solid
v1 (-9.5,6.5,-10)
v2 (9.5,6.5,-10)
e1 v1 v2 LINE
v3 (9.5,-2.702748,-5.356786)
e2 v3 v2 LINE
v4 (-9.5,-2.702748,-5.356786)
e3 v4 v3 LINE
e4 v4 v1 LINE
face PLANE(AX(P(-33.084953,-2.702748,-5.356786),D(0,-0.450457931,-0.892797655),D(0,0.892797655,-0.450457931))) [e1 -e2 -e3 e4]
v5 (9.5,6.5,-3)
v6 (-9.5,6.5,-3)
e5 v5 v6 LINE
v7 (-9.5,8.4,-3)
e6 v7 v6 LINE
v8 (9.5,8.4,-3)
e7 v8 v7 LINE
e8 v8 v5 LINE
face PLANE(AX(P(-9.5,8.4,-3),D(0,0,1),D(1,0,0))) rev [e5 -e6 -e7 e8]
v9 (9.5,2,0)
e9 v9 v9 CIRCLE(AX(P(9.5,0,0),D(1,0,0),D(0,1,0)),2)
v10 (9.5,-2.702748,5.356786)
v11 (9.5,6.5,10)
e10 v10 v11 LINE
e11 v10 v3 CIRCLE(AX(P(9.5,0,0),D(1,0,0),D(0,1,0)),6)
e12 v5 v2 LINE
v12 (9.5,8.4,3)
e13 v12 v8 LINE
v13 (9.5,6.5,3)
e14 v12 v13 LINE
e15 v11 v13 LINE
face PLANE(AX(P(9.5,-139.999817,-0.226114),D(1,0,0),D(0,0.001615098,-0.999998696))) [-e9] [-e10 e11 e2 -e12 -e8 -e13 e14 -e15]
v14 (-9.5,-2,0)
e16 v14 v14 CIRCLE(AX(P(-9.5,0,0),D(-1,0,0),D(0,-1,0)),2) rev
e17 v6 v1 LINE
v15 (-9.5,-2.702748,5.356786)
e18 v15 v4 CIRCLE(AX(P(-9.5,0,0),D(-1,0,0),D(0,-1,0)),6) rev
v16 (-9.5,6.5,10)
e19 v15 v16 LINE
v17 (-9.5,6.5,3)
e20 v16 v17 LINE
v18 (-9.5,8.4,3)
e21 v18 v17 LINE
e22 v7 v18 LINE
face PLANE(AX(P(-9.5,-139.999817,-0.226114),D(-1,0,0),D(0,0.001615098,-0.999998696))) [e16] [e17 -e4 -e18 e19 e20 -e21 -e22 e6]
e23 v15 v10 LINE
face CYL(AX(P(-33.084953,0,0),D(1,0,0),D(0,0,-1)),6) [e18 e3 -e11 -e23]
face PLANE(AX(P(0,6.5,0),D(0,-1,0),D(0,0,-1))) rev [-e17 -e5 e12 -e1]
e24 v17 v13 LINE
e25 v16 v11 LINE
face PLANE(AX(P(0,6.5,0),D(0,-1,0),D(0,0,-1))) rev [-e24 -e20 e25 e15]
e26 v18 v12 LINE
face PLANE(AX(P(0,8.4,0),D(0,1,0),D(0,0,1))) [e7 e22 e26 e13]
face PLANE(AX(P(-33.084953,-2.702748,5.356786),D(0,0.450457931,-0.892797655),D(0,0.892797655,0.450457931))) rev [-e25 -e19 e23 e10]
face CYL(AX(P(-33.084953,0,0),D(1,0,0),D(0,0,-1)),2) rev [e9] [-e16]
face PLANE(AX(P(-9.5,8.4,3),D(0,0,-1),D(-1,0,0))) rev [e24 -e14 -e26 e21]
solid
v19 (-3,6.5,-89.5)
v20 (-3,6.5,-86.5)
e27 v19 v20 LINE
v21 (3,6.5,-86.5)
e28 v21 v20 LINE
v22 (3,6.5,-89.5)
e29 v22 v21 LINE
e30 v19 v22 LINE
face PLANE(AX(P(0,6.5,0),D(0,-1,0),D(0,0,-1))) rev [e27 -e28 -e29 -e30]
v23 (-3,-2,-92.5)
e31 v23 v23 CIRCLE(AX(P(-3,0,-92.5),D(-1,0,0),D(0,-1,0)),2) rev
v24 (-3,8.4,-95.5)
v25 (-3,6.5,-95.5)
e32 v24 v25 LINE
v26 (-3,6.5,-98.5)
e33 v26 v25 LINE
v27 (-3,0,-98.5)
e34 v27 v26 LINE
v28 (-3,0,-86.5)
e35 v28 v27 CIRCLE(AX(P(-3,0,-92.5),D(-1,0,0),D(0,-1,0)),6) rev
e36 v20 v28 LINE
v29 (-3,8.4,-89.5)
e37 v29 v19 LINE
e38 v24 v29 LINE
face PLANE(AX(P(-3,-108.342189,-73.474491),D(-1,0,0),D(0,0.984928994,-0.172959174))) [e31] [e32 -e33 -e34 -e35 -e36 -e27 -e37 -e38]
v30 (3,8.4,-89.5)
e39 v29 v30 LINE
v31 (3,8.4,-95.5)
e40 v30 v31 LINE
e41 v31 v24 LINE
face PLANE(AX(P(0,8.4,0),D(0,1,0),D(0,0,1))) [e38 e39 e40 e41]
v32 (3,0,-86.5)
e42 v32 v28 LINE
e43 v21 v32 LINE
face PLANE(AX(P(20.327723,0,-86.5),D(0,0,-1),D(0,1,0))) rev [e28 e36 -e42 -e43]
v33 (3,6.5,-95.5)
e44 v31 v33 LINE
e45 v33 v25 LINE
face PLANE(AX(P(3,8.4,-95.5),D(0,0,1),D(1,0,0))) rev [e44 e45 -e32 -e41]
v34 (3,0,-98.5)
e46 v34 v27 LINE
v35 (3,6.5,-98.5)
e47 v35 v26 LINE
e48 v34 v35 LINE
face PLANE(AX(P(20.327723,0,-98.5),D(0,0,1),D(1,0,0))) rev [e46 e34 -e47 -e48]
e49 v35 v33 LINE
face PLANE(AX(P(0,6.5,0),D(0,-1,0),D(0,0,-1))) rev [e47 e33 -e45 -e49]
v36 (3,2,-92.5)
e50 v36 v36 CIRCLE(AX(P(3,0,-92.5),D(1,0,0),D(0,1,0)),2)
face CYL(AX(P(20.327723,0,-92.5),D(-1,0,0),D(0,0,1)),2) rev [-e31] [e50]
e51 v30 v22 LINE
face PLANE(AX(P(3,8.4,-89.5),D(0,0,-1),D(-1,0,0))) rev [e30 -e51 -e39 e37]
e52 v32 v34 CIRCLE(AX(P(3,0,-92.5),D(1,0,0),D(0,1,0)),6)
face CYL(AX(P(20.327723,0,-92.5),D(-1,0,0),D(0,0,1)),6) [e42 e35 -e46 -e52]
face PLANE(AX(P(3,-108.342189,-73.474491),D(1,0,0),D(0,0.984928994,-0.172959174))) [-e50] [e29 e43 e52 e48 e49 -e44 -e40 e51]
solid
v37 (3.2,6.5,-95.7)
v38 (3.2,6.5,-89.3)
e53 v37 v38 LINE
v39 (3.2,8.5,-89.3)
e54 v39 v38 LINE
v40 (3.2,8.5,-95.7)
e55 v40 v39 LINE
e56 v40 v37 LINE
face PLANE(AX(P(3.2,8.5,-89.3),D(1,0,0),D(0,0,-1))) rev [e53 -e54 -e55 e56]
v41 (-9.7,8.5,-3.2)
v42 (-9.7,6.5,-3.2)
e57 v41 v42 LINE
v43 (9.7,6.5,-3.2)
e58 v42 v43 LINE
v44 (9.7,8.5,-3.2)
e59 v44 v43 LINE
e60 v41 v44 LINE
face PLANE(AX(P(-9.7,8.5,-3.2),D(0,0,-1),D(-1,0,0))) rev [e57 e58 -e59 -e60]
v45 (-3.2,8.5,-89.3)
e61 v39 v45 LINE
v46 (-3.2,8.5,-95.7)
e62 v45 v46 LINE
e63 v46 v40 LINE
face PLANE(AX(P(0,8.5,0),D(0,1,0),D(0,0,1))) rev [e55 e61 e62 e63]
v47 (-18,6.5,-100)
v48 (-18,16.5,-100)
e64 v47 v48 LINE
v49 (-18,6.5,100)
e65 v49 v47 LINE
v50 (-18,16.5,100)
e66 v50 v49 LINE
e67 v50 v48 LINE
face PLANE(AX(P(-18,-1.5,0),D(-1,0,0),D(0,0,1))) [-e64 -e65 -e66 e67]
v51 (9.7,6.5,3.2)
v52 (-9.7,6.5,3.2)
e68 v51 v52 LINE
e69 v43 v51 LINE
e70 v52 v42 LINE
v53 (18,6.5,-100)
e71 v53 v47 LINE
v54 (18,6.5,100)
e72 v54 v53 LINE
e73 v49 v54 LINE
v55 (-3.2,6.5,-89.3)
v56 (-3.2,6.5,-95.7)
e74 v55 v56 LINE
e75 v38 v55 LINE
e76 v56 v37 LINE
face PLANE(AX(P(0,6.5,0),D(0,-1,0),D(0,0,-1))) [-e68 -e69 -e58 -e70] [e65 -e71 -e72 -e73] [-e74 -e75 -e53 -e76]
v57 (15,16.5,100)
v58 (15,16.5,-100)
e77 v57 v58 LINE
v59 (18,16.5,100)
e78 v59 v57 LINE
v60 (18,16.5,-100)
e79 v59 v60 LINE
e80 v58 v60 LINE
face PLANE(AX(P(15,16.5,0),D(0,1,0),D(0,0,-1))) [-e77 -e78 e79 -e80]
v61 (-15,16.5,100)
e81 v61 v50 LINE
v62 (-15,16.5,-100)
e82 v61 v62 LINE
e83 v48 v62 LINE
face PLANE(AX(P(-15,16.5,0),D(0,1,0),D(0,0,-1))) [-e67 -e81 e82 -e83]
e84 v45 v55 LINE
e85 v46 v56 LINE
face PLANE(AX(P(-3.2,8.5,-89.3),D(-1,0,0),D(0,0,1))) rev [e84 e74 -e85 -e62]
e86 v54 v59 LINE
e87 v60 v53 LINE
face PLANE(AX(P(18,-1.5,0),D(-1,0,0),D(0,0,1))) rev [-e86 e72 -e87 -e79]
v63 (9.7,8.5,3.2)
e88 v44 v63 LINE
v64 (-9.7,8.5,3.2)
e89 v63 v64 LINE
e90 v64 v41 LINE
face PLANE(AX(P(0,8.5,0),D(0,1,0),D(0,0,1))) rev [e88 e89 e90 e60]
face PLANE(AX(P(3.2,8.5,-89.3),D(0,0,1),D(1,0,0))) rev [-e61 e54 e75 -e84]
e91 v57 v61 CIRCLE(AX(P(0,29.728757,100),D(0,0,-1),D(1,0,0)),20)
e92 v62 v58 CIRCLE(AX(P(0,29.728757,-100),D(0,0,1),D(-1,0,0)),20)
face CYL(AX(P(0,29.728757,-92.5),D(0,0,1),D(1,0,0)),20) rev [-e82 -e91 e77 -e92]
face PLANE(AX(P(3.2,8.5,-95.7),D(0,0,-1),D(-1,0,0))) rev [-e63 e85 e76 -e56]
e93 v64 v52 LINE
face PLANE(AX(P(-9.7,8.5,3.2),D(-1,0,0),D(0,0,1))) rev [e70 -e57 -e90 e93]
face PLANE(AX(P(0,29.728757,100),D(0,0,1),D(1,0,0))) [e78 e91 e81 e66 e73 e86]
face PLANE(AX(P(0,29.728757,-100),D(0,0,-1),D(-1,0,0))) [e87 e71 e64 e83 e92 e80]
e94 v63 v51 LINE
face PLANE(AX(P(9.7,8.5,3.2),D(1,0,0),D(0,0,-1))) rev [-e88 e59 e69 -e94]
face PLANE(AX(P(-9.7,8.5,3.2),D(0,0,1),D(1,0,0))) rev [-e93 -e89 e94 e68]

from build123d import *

# Parameters (mm, degrees)
THICKEN1_START           = -92.5
THICKEN1_OUTLINE_W       = 30
THICKEN1_OUTLINE_H       = 4.5
THICKEN1_DEPTH           = 185
THICKEN2_START           = -92.5
THICKEN2_OUTLINE_W       = 3
THICKEN2_OUTLINE_H       = 18
THICKEN2_DEPTH           = 185
THICKEN3_START           = -92.5
THICKEN3_OUTLINE_W       = 3
THICKEN3_OUTLINE_H       = 18
THICKEN3_DEPTH           = 185
BOSS_EXTRUDE1_DEPTH      = 185
SKETCH7_W                = 36
SKETCH7_H                = 8
CUT_EXTRUDE1_DEPTH       = 187.604528348
BOSS_EXTRUDE2_DEPTH      = 7.5
BOSS_EXTRUDE3_START      = 7.5
BOSS_EXTRUDE3_DEPTH      = 7.5
BOSS_EXTRUDE4_DEPTH      = 9.5
BOSS_EXTRUDE4_DEPTH_BACK = 9.5
SKETCH10_R               = 6
SKETCH10_R_2             = 2
BOSS_EXTRUDE5_DEPTH      = 3
BOSS_EXTRUDE5_DEPTH_BACK = 3
SKETCH11_R               = 6
SKETCH11_R_2             = 2
SKETCH12_W               = 19.4
SKETCH12_H               = 6.4
SKETCH12_W_2             = 6.4
CUT_EXTRUDE2_DEPTH       = 2
SKETCH13_W               = 6
SKETCH13_H               = 6
SKETCH13_W_2             = 19
BOSS_EXTRUDE6_DEPTH      = 1.9


# Read off the part's stored shape, not the designer's step: Thicken1, Thicken2, Thicken3
with BuildPart() as part:
    # Thicken1 outline → Thicken1 (new body)
    with BuildSketch(Plane.XY.offset(THICKEN1_START)):
        with Locations((0, 0.75)):
            Rectangle(THICKEN1_OUTLINE_W, THICKEN1_OUTLINE_H)
    extrude(amount=THICKEN1_DEPTH)

    # Thicken2 outline → Thicken2 (add)
    with BuildSketch(Plane.XY.offset(THICKEN2_START)):
        with Locations((16.5, 7.5)):
            Rectangle(THICKEN2_OUTLINE_W, THICKEN2_OUTLINE_H)
    extrude(amount=THICKEN2_DEPTH)

    # Thicken3 outline → Thicken3 (add)
    with BuildSketch(Plane.XY.offset(THICKEN3_START)):
        with Locations((-16.5, 7.5)):
            Rectangle(THICKEN3_OUTLINE_W, THICKEN3_OUTLINE_H)
    extrude(amount=THICKEN3_DEPTH)

    # Sketch4 → Boss-Extrude1 (add)
    with BuildSketch(Plane.XY.offset(92.5)):
        with BuildLine():
            Line((-15, 16.5), (-15, 3))
            Line((-15, 3), (15, 3))
            Line((15, 3), (15, 16.5))
            ThreePointArc((15, 16.5), (0, 9.728756555), (-15, 16.5))
        make_face()
    extrude(amount=-BOSS_EXTRUDE1_DEPTH)

    # Sketch7 → Cut-Extrude1 (cut, through all)
    with BuildSketch(Plane(origin=(0, 0, -92.5), x_dir=(-1, 0, 0), z_dir=(0, 0, -1))):
        with Locations((0, 2.5)):
            Rectangle(SKETCH7_W, SKETCH7_H)
    extrude(amount=-CUT_EXTRUDE1_DEPTH, mode=Mode.SUBTRACT)

    # Sketch8 → Boss-Extrude2 (add)
    with BuildSketch(Plane(origin=(0, 0, -92.5), x_dir=(-1, 0, 0), z_dir=(0, 0, -1))):
        with BuildLine():
            Line((-18, 6.5), (18, 6.5))
            Line((18, 6.5), (18, 16.5))
            Line((18, 16.5), (15, 16.5))
            ThreePointArc((15, 16.5), (0, 9.728756555), (-15, 16.5))
            Line((-15, 16.5), (-18, 16.5))
            Line((-18, 16.5), (-18, 6.5))
        make_face()
    extrude(amount=BOSS_EXTRUDE2_DEPTH)

    # Sketch9 → Boss-Extrude3 (add)
    with BuildSketch(Plane.XY.offset(92.5).offset(BOSS_EXTRUDE3_START)):
        with BuildLine():
            Line((-18, 6.5), (18, 6.5))
            Line((18, 6.5), (18, 16.5))
            Line((18, 16.5), (15, 16.5))
            ThreePointArc((15, 16.5), (0, 9.728756555), (-15, 16.5))
            Line((-15, 16.5), (-18, 16.5))
            Line((-18, 16.5), (-18, 6.5))
        make_face()
    extrude(amount=-BOSS_EXTRUDE3_DEPTH)

    # Sketch10 → Boss-Extrude4 (add, two sides: drawn at the far end of the back side and taken through both)
    # profile 1 of 2: a face of its own
    with BuildSketch(Plane(origin=(0, 0, 0), x_dir=(0, 0, -1), z_dir=(1, 0, 0)).offset(-BOSS_EXTRUDE4_DEPTH_BACK)):
        Circle(SKETCH10_R)
        with Locations(Location((0, 0, 0), (0, 0, 90))):
            Circle(SKETCH10_R_2, mode=Mode.SUBTRACT)
    # profile 2 of 2: a face of its own
    with BuildSketch(Plane(origin=(0, 0, 0), x_dir=(0, 0, -1), z_dir=(1, 0, 0)).offset(-BOSS_EXTRUDE4_DEPTH_BACK)):
        with BuildLine():
            Line((10, 6.5), (-10, 6.5))
            Line((-10, 6.5), (-5.35678593, -2.702747584))
            ThreePointArc((-5.35678593, -2.702747584), (-1.389115622, 5.836981908), (6, 0))
            ThreePointArc((6, 0), (5.836981908, -1.389115622), (5.35678593, -2.702747584))
            Line((5.35678593, -2.702747584), (10, 6.5))
        make_face()
    extrude(amount=BOSS_EXTRUDE4_DEPTH + BOSS_EXTRUDE4_DEPTH_BACK)

    # Sketch11 → Boss-Extrude5 (add, two sides: drawn at the far end of the back side and taken through both)
    # profile 1 of 2: a face of its own
    with BuildSketch(Plane(origin=(0, 0, 0), x_dir=(0, 0, -1), z_dir=(1, 0, 0)).offset(-BOSS_EXTRUDE5_DEPTH_BACK)):
        with Locations((92.5, 0)):
            Circle(SKETCH11_R)
        with Locations(Location((92.5, 0, 0), (0, 0, 90))):
            Circle(SKETCH11_R_2, mode=Mode.SUBTRACT)
    # profile 2 of 2: a face of its own
    with BuildSketch(Plane(origin=(0, 0, 0), x_dir=(0, 0, -1), z_dir=(1, 0, 0)).offset(-BOSS_EXTRUDE5_DEPTH_BACK)):
        with BuildLine():
            ThreePointArc((86.5, 0), (92.5, 6), (98.5, 0))
            Line((98.5, 0), (98.5, 6.5))
            Line((98.5, 6.5), (86.5, 6.5))
            Line((86.5, 6.5), (86.5, 0))
        make_face()
    extrude(amount=BOSS_EXTRUDE5_DEPTH + BOSS_EXTRUDE5_DEPTH_BACK)


with BuildPart() as body_2:
    # Split1: the piece on the far side of the plane
    add(part.part)
    split(bisect_by=Plane(origin=(0, 6.5, 0), x_dir=(0, 0, -1), z_dir=(0, -1, 0)), keep=Keep.BOTTOM)

    # Sketch12 → Cut-Extrude2 (cut)
    with BuildSketch(Plane.XZ.offset(-6.5)):
        Rectangle(SKETCH12_W, SKETCH12_H)
        with Locations((0, -92.5)):
            Rectangle(SKETCH12_W_2, SKETCH12_H)
    extrude(amount=-CUT_EXTRUDE2_DEPTH, mode=Mode.SUBTRACT)


with BuildPart() as part_1:
    add(part.part)

    # Split1
    split(bisect_by=Plane(origin=(0, 6.5, 0), x_dir=(0, 0, -1), z_dir=(0, -1, 0)), keep=Keep.TOP)

    # Sketch13 → Boss-Extrude6 (add)
    with BuildSketch(Plane(origin=(0, 6.5, 0), x_dir=(1, 0, 0), z_dir=(0, 1, 0))):
        with Locations((0, 92.5)):
            Rectangle(SKETCH13_W, SKETCH13_H)
        Rectangle(SKETCH13_W_2, SKETCH13_H)
    extrude(amount=BOSS_EXTRUDE6_DEPTH)


solid = Compound([body_2.part, part_1.part])
